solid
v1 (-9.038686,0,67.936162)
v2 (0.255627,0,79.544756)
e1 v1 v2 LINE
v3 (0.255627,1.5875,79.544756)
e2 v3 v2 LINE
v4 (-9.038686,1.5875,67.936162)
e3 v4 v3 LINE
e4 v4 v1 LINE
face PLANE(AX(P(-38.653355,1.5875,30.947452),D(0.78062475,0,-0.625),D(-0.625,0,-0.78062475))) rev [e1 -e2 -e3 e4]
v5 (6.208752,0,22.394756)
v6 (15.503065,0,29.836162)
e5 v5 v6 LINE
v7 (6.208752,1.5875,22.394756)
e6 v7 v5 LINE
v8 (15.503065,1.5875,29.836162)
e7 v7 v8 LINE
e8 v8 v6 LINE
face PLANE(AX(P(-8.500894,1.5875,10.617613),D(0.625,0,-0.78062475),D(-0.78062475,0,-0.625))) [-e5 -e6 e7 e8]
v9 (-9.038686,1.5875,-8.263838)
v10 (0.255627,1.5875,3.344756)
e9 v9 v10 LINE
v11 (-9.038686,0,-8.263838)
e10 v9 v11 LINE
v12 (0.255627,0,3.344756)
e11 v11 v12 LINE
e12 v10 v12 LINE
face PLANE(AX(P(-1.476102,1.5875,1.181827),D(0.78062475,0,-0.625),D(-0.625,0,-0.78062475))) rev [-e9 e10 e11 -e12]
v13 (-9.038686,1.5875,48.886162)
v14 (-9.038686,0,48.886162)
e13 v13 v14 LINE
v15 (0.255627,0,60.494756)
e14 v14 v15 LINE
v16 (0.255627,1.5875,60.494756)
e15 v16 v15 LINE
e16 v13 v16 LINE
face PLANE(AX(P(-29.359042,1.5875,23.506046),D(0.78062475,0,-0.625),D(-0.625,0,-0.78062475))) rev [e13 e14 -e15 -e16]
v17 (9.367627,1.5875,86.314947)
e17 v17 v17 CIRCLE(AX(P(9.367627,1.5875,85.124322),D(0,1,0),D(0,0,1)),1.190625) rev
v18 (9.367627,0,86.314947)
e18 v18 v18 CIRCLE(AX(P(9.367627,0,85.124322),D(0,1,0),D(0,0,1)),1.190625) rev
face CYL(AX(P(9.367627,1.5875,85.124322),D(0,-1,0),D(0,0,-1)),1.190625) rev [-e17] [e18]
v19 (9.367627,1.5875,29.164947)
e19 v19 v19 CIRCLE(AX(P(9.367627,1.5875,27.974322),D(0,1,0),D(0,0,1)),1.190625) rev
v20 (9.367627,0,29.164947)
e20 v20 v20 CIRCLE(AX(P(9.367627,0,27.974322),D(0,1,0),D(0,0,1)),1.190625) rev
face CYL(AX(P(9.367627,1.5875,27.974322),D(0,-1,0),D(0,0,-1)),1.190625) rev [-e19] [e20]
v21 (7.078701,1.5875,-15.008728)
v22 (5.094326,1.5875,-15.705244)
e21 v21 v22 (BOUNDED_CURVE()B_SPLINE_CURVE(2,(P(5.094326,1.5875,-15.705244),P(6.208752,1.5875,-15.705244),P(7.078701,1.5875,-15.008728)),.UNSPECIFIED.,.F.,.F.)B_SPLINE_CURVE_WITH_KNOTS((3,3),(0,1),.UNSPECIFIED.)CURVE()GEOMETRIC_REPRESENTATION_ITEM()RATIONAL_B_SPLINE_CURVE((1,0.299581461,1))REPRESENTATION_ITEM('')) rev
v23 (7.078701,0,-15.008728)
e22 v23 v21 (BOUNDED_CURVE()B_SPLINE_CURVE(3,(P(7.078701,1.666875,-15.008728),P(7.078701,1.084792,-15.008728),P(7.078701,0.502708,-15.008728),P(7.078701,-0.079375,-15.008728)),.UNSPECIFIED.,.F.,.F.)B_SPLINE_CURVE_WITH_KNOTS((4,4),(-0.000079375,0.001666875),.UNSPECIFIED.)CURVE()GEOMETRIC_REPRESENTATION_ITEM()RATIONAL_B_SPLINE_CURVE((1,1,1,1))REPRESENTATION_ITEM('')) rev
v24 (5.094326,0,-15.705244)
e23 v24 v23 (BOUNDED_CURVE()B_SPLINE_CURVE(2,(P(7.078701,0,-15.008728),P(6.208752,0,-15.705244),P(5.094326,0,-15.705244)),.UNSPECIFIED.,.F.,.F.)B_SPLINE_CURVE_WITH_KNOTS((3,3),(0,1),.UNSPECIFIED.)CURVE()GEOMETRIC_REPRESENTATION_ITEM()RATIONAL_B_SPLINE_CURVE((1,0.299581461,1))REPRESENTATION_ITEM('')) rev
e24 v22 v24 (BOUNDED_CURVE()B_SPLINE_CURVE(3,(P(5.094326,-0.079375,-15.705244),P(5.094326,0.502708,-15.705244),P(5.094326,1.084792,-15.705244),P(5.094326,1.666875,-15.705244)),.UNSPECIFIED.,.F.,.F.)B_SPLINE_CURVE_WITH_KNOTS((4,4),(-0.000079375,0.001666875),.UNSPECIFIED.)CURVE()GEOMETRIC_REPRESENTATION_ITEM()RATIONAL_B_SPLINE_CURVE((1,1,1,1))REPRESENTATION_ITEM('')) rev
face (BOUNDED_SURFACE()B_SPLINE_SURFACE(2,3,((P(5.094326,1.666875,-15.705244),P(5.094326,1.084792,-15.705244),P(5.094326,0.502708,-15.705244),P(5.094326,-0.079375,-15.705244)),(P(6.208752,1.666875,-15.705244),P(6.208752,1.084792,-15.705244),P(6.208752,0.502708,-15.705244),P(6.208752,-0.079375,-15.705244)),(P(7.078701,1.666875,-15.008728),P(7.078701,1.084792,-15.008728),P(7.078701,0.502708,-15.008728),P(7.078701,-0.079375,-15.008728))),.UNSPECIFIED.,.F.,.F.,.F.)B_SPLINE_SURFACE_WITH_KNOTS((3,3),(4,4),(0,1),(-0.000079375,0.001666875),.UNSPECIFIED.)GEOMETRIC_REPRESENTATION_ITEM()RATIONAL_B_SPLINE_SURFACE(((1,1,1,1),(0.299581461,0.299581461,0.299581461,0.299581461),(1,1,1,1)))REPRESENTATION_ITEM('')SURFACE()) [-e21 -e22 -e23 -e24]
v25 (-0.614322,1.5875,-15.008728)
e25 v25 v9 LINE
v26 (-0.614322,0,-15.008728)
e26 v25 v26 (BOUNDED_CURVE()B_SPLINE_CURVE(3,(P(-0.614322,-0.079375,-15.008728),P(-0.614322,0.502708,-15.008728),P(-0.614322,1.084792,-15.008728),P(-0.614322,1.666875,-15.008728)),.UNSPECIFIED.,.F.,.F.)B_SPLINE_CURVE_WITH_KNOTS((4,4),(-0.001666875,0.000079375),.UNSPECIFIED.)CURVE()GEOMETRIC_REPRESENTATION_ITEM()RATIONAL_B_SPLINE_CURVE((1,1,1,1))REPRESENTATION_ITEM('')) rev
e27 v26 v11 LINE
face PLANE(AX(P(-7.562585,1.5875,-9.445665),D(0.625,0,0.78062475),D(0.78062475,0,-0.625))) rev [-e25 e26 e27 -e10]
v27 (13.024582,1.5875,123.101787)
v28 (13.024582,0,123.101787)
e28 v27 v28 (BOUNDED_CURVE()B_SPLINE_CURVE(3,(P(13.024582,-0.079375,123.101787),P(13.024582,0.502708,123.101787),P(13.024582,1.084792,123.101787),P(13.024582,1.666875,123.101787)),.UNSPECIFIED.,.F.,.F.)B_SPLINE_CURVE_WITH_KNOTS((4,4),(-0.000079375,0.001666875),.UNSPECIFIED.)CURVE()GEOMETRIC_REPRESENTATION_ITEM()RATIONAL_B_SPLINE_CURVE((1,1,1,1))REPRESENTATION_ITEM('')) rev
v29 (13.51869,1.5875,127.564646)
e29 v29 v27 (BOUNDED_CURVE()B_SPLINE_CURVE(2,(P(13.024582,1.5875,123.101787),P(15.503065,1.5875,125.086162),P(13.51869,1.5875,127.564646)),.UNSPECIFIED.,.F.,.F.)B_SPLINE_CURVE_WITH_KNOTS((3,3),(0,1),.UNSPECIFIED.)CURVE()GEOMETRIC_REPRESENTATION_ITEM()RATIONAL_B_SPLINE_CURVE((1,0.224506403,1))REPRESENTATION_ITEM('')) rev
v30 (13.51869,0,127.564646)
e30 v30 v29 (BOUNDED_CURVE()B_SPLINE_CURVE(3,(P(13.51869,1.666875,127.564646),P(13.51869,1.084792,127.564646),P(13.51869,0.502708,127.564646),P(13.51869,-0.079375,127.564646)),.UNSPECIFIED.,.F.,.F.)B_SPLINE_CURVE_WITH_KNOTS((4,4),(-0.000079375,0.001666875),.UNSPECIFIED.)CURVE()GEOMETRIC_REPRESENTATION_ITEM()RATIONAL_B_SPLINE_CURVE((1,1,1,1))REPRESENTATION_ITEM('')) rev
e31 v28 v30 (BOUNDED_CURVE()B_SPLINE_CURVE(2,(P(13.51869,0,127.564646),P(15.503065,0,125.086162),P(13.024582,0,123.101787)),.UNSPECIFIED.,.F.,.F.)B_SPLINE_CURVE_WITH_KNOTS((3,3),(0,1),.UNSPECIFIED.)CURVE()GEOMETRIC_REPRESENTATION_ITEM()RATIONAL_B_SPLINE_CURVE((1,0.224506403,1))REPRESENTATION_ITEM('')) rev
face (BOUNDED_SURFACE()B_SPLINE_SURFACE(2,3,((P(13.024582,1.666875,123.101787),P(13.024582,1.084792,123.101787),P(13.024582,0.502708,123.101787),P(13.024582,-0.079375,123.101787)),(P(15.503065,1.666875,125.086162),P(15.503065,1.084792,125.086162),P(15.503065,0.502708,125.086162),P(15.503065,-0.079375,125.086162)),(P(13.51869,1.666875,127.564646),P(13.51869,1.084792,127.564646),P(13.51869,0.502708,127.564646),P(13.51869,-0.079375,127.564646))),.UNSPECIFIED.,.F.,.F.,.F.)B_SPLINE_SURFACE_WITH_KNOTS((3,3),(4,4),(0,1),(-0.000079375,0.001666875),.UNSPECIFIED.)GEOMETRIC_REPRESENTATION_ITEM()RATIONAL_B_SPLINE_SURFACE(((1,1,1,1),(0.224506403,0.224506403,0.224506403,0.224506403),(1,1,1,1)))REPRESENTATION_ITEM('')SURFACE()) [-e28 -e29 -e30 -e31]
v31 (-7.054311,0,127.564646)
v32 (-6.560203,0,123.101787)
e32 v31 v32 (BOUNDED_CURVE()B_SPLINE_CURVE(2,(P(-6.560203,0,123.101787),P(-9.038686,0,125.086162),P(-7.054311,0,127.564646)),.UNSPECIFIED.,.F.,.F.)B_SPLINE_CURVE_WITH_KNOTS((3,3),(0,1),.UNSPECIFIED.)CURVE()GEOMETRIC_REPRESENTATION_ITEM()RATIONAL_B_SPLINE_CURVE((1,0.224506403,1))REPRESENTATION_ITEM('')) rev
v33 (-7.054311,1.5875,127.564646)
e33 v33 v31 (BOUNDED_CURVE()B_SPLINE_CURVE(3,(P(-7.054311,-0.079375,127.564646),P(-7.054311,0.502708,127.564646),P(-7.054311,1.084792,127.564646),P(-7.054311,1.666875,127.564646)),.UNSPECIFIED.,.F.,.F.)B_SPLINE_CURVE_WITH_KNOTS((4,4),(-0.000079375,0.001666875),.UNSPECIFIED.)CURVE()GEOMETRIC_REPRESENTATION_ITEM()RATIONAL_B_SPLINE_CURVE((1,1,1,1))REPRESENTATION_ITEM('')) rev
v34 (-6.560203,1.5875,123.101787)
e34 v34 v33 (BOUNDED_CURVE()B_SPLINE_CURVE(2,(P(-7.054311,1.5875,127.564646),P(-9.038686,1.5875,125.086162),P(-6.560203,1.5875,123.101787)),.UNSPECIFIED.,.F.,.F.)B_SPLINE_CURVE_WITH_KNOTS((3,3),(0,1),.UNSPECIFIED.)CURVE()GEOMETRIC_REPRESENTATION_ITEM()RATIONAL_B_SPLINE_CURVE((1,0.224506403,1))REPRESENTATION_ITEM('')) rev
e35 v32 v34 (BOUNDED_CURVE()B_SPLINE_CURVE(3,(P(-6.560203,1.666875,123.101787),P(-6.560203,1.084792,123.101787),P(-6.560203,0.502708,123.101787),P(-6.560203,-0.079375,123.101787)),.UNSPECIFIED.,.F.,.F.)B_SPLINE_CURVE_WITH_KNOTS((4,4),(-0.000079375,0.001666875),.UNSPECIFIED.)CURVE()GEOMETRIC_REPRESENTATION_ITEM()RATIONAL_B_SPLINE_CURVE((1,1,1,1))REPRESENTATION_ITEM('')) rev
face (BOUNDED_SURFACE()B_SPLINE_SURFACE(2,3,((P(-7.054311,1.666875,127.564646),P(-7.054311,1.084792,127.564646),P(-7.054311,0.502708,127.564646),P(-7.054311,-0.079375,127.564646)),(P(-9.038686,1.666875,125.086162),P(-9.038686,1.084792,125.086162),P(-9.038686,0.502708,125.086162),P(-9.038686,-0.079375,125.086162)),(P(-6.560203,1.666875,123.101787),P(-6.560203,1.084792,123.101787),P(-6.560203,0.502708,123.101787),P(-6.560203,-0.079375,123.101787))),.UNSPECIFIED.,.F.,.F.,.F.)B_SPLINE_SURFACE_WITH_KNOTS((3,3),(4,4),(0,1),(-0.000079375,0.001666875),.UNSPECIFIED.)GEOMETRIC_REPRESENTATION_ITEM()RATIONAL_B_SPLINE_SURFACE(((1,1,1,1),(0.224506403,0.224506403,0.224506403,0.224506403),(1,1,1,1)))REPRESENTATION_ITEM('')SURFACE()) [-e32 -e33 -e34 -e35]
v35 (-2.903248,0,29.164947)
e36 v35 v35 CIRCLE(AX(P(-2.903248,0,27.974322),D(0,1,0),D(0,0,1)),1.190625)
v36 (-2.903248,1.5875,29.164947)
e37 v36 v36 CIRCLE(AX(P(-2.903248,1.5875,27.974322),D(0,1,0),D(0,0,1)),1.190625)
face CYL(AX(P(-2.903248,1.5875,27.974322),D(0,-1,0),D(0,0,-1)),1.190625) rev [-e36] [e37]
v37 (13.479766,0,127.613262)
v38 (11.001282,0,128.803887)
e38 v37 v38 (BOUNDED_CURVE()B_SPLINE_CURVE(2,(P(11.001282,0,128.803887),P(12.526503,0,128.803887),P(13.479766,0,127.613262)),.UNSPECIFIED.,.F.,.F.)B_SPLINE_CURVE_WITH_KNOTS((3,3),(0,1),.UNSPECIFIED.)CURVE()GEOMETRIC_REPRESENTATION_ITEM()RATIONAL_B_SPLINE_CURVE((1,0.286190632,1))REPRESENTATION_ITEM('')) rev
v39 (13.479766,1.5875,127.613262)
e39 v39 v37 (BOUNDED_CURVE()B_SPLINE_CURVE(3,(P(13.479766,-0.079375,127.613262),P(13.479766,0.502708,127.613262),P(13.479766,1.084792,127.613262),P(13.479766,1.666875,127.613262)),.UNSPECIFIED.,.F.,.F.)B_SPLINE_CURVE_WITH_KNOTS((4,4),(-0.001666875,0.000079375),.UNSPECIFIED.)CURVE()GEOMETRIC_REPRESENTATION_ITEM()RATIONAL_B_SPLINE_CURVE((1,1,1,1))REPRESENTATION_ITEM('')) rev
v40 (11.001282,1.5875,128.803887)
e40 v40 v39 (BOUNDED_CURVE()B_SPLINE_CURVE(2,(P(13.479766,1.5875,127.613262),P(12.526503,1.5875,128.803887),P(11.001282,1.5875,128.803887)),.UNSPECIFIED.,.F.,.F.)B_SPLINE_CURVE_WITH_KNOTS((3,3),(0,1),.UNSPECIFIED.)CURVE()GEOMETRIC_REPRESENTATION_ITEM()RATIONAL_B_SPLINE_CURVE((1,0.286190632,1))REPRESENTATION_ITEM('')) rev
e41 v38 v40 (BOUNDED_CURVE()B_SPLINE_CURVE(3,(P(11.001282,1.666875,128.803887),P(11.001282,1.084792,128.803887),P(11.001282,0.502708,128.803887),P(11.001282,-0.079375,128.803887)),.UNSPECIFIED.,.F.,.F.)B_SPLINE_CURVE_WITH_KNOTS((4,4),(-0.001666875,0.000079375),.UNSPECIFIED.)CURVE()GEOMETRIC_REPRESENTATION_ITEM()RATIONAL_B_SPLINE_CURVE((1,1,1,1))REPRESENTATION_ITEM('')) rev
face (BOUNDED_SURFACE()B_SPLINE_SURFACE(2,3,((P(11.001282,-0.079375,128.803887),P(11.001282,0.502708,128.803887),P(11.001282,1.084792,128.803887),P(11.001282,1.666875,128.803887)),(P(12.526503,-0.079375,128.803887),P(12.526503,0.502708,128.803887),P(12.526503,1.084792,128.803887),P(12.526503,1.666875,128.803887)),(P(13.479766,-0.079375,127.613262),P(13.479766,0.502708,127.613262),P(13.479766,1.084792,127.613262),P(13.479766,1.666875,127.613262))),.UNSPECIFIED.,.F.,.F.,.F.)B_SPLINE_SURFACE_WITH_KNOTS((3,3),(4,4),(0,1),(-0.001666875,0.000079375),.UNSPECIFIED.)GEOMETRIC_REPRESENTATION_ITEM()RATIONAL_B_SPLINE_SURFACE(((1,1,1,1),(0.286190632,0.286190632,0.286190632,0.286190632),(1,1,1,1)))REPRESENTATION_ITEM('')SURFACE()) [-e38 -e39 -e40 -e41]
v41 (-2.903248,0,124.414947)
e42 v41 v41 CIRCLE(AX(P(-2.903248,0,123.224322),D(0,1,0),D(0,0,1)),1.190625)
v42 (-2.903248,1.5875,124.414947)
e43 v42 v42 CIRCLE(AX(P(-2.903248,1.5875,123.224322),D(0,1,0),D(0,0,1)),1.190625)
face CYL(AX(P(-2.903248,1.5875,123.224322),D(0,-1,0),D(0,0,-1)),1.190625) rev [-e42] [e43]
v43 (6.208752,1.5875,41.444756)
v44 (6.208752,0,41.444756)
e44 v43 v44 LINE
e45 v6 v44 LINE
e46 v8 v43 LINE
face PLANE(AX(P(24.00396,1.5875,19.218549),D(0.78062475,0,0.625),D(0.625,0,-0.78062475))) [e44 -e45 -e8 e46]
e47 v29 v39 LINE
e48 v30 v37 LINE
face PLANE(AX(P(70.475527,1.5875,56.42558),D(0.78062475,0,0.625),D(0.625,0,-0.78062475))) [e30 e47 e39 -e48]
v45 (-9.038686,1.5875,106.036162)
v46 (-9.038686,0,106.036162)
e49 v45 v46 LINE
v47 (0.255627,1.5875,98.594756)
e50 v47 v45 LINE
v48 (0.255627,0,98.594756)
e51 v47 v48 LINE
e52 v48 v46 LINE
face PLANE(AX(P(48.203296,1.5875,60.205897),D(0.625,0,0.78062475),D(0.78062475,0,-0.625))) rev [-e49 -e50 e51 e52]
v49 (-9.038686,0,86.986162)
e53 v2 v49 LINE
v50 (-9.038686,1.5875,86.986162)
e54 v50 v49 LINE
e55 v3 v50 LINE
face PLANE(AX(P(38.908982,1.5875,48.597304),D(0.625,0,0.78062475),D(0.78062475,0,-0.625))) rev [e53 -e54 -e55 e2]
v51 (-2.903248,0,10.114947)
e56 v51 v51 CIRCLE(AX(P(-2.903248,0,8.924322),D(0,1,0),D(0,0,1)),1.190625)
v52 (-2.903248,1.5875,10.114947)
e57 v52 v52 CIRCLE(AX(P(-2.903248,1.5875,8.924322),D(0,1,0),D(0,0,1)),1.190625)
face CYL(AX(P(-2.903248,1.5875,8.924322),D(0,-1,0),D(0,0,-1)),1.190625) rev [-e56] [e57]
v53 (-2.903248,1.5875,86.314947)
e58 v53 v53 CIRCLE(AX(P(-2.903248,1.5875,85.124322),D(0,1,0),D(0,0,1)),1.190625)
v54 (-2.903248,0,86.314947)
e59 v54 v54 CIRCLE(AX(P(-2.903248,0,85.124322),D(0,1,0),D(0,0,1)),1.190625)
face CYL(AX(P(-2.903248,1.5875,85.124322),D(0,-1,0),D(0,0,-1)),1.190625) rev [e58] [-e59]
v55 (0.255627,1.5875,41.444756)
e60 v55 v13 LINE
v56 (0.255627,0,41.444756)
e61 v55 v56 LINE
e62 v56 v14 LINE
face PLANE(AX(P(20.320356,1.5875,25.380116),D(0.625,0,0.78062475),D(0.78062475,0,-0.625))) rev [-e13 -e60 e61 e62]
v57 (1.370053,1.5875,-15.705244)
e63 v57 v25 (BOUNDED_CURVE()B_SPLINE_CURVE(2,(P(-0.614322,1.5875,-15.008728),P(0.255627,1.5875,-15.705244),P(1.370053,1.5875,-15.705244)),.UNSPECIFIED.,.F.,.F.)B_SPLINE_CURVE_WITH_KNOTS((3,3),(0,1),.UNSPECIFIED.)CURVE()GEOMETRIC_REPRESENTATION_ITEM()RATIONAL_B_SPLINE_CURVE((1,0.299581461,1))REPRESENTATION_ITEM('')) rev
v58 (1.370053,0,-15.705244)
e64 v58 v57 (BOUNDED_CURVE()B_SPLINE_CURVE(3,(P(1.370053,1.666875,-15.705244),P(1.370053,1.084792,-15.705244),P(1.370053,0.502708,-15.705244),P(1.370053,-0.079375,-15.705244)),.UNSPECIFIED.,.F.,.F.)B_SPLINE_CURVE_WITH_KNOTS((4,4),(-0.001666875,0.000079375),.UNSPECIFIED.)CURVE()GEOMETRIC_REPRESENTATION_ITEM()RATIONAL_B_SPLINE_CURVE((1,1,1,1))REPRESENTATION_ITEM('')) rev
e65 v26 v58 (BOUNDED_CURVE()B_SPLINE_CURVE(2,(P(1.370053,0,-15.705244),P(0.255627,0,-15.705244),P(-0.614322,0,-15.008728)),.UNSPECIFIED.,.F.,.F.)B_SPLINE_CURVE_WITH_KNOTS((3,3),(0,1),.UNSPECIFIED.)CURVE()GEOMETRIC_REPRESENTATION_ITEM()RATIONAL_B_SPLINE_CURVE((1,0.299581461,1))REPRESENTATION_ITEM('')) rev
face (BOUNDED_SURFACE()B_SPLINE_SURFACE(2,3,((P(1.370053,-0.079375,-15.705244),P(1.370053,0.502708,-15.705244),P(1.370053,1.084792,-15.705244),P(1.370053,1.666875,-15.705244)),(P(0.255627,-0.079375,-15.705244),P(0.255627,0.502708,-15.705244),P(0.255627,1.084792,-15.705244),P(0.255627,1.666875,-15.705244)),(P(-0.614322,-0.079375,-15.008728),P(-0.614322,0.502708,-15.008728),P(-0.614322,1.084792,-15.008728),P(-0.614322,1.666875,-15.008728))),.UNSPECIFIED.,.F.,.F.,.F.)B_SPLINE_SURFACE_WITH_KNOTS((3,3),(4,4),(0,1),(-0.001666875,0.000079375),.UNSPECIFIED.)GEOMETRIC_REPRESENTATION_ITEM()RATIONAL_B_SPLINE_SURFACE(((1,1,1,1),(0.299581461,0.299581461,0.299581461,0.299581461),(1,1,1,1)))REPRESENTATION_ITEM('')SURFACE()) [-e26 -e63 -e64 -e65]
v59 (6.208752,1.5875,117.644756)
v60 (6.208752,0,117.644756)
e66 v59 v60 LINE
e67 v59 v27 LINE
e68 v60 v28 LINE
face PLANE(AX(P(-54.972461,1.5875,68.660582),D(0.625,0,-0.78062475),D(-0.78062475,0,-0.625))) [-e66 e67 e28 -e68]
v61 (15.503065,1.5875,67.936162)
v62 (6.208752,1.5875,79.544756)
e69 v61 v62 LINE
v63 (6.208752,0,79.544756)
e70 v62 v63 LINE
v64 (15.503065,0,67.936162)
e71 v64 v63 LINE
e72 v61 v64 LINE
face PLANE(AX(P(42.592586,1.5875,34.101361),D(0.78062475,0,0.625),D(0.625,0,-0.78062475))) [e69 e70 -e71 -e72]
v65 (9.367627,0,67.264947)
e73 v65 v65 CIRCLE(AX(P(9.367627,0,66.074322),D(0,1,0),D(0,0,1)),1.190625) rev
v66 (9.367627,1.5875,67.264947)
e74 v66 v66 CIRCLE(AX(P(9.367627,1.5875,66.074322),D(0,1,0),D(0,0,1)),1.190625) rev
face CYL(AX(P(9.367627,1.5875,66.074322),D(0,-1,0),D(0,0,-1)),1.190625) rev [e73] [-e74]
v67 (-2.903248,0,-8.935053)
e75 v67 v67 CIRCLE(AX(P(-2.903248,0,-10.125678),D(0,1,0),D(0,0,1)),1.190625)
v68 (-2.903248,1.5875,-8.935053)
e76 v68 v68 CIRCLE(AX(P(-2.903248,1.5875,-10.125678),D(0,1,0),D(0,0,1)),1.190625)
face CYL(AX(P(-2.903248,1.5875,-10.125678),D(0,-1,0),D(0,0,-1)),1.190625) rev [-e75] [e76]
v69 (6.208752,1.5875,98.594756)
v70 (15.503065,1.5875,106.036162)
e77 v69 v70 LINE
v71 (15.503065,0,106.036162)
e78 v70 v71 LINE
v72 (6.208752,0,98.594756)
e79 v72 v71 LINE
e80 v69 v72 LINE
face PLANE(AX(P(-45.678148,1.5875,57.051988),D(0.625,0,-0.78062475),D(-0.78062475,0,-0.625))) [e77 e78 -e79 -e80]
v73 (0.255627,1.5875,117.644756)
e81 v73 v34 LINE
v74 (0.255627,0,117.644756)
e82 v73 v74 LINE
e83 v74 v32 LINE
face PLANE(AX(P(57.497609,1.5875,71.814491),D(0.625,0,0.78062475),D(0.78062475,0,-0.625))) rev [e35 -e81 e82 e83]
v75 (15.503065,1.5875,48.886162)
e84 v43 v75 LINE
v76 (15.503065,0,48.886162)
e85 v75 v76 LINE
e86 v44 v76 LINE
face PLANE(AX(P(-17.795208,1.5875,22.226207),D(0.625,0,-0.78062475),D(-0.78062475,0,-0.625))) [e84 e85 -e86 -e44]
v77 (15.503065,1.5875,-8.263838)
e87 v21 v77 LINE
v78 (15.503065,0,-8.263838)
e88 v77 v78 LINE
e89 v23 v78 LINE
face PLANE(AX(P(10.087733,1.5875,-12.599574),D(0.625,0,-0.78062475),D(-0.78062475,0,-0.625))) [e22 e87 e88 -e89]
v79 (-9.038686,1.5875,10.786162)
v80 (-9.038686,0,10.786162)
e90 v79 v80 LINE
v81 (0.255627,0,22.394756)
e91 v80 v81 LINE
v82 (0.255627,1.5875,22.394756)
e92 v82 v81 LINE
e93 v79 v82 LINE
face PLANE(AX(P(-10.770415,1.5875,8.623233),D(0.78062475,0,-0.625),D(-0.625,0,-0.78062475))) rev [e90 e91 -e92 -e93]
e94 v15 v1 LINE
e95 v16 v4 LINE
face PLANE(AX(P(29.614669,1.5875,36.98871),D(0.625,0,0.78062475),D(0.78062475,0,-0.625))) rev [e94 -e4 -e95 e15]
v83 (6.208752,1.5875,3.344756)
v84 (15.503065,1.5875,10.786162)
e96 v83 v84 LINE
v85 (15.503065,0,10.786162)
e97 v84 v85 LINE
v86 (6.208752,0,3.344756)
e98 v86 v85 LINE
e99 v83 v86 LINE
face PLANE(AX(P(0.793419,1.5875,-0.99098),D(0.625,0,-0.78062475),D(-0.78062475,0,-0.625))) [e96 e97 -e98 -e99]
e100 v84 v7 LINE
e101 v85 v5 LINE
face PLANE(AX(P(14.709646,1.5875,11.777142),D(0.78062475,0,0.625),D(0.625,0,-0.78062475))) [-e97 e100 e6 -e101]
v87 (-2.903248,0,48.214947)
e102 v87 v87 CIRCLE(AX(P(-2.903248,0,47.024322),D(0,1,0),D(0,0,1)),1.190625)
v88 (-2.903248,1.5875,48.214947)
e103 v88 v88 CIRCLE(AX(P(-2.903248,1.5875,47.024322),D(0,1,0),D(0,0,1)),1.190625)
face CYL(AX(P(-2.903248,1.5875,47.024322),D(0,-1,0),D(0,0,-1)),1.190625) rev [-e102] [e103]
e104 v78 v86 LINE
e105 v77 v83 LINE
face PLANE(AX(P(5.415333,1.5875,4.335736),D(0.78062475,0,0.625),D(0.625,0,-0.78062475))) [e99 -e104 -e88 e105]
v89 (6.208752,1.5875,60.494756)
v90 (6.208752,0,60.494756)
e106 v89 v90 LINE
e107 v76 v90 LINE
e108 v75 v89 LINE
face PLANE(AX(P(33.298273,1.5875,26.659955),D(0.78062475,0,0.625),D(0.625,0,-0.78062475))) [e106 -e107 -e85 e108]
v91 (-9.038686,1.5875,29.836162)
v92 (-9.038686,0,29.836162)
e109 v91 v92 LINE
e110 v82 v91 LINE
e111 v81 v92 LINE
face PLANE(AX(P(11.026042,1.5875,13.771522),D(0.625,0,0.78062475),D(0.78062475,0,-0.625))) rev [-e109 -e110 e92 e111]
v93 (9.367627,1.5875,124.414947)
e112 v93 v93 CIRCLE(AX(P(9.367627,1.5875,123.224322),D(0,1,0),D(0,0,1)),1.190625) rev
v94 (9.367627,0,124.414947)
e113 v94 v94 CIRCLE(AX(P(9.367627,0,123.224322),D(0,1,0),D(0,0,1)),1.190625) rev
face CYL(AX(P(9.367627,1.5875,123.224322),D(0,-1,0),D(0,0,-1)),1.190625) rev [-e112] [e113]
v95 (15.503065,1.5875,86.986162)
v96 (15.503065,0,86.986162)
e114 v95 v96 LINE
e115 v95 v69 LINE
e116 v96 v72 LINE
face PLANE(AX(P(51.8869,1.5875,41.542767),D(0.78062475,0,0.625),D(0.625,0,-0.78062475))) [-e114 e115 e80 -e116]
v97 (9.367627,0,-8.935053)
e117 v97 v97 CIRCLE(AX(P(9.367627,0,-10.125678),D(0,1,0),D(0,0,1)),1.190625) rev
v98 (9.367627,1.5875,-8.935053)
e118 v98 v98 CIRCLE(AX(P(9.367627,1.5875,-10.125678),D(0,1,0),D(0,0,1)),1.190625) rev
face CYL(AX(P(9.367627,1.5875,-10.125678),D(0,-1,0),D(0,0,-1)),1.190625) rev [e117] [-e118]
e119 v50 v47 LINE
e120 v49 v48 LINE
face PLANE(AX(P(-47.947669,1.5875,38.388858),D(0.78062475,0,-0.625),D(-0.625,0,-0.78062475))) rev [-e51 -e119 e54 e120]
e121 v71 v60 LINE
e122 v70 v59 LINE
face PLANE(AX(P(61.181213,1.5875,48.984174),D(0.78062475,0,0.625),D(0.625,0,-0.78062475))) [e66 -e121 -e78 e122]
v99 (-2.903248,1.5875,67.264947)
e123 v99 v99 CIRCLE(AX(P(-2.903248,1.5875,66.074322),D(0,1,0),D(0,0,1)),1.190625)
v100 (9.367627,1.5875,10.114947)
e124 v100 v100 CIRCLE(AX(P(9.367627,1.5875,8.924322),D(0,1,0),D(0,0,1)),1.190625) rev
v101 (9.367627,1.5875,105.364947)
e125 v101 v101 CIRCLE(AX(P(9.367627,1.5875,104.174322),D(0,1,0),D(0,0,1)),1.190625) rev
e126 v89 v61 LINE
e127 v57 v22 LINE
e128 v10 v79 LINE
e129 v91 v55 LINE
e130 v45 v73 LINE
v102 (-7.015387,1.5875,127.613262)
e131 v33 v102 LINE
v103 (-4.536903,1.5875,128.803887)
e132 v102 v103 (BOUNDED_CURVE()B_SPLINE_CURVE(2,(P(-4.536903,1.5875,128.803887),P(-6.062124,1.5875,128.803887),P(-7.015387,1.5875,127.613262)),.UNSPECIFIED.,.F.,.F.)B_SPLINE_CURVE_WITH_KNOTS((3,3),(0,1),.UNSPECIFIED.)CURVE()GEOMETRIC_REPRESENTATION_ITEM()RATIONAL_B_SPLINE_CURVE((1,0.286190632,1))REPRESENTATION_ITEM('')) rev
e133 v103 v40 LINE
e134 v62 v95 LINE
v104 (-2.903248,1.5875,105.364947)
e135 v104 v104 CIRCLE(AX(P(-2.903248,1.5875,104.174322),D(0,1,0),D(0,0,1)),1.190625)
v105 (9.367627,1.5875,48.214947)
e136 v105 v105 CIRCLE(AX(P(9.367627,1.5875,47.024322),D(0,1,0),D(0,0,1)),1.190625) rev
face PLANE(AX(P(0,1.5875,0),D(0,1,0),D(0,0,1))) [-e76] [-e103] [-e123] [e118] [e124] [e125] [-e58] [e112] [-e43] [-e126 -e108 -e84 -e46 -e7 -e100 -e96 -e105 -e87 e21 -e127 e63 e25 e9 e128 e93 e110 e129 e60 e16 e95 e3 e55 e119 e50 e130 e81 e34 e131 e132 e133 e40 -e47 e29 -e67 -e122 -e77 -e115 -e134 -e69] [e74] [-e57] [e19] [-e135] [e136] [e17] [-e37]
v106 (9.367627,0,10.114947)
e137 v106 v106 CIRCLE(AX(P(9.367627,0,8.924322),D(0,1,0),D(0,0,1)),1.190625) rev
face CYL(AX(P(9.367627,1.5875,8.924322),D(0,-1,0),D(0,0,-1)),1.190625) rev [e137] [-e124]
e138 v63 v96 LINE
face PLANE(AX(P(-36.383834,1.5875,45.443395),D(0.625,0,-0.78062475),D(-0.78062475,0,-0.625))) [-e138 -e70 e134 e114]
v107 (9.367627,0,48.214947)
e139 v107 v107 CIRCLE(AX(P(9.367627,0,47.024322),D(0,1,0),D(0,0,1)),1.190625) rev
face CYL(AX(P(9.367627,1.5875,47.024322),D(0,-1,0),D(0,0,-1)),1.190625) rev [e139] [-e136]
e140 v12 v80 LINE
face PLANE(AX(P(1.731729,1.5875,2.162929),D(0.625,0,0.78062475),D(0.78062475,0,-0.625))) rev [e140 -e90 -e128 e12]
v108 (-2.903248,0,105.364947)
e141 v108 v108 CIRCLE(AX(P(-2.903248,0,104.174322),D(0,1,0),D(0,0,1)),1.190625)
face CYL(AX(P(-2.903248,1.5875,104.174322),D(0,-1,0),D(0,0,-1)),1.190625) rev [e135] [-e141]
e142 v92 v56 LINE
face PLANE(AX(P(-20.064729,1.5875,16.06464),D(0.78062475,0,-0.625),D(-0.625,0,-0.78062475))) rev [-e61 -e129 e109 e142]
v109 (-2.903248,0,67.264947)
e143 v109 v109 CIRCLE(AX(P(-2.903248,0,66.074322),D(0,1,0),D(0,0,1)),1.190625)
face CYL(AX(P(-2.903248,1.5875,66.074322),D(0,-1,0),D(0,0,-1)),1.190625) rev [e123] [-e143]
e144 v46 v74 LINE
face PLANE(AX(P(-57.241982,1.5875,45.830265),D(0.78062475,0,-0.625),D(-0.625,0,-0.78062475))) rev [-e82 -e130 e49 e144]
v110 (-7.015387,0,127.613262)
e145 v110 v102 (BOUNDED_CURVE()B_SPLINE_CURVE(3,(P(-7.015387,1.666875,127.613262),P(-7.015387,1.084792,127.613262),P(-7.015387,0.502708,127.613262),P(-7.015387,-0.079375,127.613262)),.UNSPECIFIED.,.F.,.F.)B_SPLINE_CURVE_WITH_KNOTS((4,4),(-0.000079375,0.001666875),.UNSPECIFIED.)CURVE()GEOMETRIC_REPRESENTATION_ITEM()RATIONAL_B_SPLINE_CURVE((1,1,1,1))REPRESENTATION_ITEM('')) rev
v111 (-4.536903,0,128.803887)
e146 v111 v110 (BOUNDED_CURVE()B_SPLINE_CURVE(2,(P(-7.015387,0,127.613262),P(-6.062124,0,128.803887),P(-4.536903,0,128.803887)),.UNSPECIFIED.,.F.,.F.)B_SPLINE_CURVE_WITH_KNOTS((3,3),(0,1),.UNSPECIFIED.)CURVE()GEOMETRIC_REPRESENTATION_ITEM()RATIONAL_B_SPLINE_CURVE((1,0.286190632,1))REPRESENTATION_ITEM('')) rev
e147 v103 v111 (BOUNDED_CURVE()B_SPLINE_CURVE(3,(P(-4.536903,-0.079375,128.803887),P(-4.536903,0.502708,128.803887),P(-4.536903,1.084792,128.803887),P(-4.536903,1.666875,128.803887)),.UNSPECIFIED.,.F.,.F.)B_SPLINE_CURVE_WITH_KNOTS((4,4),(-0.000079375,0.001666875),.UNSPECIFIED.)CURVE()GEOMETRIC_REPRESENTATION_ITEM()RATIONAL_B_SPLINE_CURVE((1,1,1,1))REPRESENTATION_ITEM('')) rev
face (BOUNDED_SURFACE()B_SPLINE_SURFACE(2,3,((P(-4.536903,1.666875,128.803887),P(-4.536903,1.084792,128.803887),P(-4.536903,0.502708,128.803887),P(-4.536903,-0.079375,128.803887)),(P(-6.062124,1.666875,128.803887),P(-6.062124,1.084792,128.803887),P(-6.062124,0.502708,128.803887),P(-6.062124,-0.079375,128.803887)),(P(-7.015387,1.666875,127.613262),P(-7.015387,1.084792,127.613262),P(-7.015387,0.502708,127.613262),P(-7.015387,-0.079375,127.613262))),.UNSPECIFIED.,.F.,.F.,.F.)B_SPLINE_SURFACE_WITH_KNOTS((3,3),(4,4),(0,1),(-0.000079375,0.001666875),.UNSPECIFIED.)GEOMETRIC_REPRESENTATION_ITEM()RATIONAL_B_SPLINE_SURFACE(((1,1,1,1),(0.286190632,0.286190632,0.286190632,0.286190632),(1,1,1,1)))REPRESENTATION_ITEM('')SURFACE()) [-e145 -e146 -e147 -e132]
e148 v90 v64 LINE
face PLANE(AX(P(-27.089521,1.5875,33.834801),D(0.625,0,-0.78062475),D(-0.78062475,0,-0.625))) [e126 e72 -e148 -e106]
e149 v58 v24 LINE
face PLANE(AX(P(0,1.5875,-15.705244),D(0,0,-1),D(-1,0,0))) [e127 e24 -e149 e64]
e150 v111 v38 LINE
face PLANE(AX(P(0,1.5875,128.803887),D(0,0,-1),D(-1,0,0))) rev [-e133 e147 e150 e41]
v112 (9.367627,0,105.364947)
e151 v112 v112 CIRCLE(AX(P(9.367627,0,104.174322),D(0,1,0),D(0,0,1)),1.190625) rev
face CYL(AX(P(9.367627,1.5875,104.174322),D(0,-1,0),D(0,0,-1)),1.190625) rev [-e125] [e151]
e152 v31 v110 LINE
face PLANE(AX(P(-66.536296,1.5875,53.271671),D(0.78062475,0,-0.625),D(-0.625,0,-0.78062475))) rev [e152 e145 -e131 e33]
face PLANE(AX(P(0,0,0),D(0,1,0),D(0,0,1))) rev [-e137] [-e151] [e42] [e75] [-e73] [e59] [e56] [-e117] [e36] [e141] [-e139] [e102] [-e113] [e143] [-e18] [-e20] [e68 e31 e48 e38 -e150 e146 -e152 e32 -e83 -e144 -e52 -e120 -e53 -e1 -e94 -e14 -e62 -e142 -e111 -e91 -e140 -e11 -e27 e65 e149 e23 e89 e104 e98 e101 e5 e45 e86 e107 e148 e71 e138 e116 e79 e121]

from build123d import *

# Parameters (mm, degrees)
SKETCH2_R           = 1.190625
BOSS_EXTRUDE1_DEPTH = 1.5875
FILLET1_SIZE        = 3.175


with BuildPart() as part:
    # Sketch2 → Boss-Extrude1 (new body)
    with BuildSketch(Plane(origin=(0, 0, 0), x_dir=(1, 0, 0), z_dir=(0, 1, 0))):
        Polygon((-9.038686402, -10.786161972), (0.255627025, -22.394755722), (-9.038686402, -29.836161972), (0.255627025, -41.444755722), (-9.038686402, -48.886161972), (0.255627025, -60.494755722), (-9.038686402, -67.936161972), (0.255627025, -79.544755722), (-9.038686402, -86.986161972), (0.255627025, -98.594755722), (-9.038686402, -106.036161972), (0.255627025, -117.644755722), (-9.038686402, -125.086161972), (-6.062123902, -128.803887343), (12.526502953, -128.803887343), (15.503065453, -125.086161972), (6.208752025, -117.644755722), (15.503065453, -106.036161972), (6.208752025, -98.594755722), (15.503065453, -86.986161972), (6.208752025, -79.544755722), (15.503065453, -67.936161972), (6.208752025, -60.494755722), (15.503065453, -48.886161972), (6.208752025, -41.444755722), (15.503065453, -29.836161972), (6.208752025, -22.394755722), (15.503065453, -10.786161972), (6.208752025, -3.344755722), (15.503065453, 8.263838028), (6.208752025, 15.705244278), (0.255627025, 15.705244278), (-9.038686402, 8.263838028), (0.255627025, -3.344755722), align=None)
        with Locations(Location((-2.903248438, 10.125678468, 0), (0, 0, 270))):
            Circle(SKETCH2_R, mode=Mode.SUBTRACT)
        with Locations(Location((-2.903248438, -8.924321532, 0), (0, 0, 270))):
            Circle(SKETCH2_R, mode=Mode.SUBTRACT)
        with Locations(Location((-2.903248438, -27.974321532, 0), (0, 0, 270))):
            Circle(SKETCH2_R, mode=Mode.SUBTRACT)
        with Locations(Location((-2.903248438, -47.024321532, 0), (0, 0, 270))):
            Circle(SKETCH2_R, mode=Mode.SUBTRACT)
        with Locations(Location((-2.903248438, -66.074321532, 0), (0, 0, 270))):
            Circle(SKETCH2_R, mode=Mode.SUBTRACT)
        with Locations(Location((-2.903248438, -85.124321532, 0), (0, 0, 270))):
            Circle(SKETCH2_R, mode=Mode.SUBTRACT)
        with Locations(Location((-2.903248438, -104.174321532, 0), (0, 0, 270))):
            Circle(SKETCH2_R, mode=Mode.SUBTRACT)
        with Locations(Location((-2.903248438, -123.224321532, 0), (0, 0, 270))):
            Circle(SKETCH2_R, mode=Mode.SUBTRACT)
        with Locations(Location((9.367627489, -123.224321532, 0), (0, 0, 270))):
            Circle(SKETCH2_R, mode=Mode.SUBTRACT)
        with Locations(Location((9.367627489, -104.174321532, 0), (0, 0, 270))):
            Circle(SKETCH2_R, mode=Mode.SUBTRACT)
        with Locations(Location((9.367627489, -85.124321532, 0), (0, 0, 270))):
            Circle(SKETCH2_R, mode=Mode.SUBTRACT)
        with Locations(Location((9.367627489, -66.074321532, 0), (0, 0, 270))):
            Circle(SKETCH2_R, mode=Mode.SUBTRACT)
        with Locations(Location((9.367627489, -47.024321532, 0), (0, 0, 270))):
            Circle(SKETCH2_R, mode=Mode.SUBTRACT)
        with Locations(Location((9.367627489, -27.974321532, 0), (0, 0, 270))):
            Circle(SKETCH2_R, mode=Mode.SUBTRACT)
        with Locations(Location((9.367627489, -8.924321532, 0), (0, 0, 270))):
            Circle(SKETCH2_R, mode=Mode.SUBTRACT)
        with Locations(Location((9.367627489, 10.125678468, 0), (0, 0, 270))):
            Circle(SKETCH2_R, mode=Mode.SUBTRACT)
    extrude(amount=BOSS_EXTRUDE1_DEPTH)

    # Fillet1
    # a fillet whose section is not a circle: 3.175 mm, written as the material it takes off along each edge
    with BuildSketch(Plane(origin=(6.208752025, -2.786065678, -15.705244278), x_dir=(0.7806247497998005, 0, 0.6249999999999992), z_dir=(0, 1, 0)), Plane(origin=(0.255627025, -2.786065678, -15.705244278), x_dir=(1, 0, 0), z_dir=(0, 1, 0))) as fillet1_piece_1:
        with BuildLine():
            Bezier((1.114426271, 0), (0, 0), (-0.869948729, -0.696516419), weights=[1, 0.299581461, 1])
            Line((-0.869948729, -0.696516419), (0, 0))
            Line((0, 0), (1.114426271, 0))
        make_face()
    extrude(amount=7.159631355, mode=Mode.SUBTRACT)
    with BuildSketch(Plane(origin=(-9.038686402, -7.9375, 125.086161972), x_dir=(0.7806247497997997, 0, -0.625), z_dir=(0, 1, 0)), Plane(origin=(15.503065453, -7.9375, 125.086161972), x_dir=(-0.6250000000125396, 0, 0.78062474978976), z_dir=(0, 1, 0))) as fillet1_piece_2:
        with BuildLine():
            Bezier((FILLET1_SIZE, 0), (0, 0), (0, -FILLET1_SIZE), weights=[1, 0.224506403, 1])
            Line((0, -FILLET1_SIZE), (0, 0))
            Line((0, 0), (FILLET1_SIZE, 0))
        make_face()
    extrude(amount=17.4625, mode=Mode.SUBTRACT)
    with BuildSketch(Plane(origin=(12.526502953, -3.813051662, 128.803887343), x_dir=(-1, 0, 0), z_dir=(0, 1, 0)), Plane(origin=(-6.062123902, -3.813051662, 128.803887343), x_dir=(-0.6249999999999978, 0, -0.7806247497998016), z_dir=(0, 1, 0))) as fillet1_piece_3:
        with BuildLine():
            Bezier((1.525220665, 0), (0, 0), (-0.953262916, -1.190625), weights=[1, 0.286190632, 1])
            Line((-0.953262916, -1.190625), (0, 0))
            Line((0, 0), (1.525220665, 0))
        make_face()
    extrude(amount=9.213603325, mode=Mode.SUBTRACT)


solid = part.part
